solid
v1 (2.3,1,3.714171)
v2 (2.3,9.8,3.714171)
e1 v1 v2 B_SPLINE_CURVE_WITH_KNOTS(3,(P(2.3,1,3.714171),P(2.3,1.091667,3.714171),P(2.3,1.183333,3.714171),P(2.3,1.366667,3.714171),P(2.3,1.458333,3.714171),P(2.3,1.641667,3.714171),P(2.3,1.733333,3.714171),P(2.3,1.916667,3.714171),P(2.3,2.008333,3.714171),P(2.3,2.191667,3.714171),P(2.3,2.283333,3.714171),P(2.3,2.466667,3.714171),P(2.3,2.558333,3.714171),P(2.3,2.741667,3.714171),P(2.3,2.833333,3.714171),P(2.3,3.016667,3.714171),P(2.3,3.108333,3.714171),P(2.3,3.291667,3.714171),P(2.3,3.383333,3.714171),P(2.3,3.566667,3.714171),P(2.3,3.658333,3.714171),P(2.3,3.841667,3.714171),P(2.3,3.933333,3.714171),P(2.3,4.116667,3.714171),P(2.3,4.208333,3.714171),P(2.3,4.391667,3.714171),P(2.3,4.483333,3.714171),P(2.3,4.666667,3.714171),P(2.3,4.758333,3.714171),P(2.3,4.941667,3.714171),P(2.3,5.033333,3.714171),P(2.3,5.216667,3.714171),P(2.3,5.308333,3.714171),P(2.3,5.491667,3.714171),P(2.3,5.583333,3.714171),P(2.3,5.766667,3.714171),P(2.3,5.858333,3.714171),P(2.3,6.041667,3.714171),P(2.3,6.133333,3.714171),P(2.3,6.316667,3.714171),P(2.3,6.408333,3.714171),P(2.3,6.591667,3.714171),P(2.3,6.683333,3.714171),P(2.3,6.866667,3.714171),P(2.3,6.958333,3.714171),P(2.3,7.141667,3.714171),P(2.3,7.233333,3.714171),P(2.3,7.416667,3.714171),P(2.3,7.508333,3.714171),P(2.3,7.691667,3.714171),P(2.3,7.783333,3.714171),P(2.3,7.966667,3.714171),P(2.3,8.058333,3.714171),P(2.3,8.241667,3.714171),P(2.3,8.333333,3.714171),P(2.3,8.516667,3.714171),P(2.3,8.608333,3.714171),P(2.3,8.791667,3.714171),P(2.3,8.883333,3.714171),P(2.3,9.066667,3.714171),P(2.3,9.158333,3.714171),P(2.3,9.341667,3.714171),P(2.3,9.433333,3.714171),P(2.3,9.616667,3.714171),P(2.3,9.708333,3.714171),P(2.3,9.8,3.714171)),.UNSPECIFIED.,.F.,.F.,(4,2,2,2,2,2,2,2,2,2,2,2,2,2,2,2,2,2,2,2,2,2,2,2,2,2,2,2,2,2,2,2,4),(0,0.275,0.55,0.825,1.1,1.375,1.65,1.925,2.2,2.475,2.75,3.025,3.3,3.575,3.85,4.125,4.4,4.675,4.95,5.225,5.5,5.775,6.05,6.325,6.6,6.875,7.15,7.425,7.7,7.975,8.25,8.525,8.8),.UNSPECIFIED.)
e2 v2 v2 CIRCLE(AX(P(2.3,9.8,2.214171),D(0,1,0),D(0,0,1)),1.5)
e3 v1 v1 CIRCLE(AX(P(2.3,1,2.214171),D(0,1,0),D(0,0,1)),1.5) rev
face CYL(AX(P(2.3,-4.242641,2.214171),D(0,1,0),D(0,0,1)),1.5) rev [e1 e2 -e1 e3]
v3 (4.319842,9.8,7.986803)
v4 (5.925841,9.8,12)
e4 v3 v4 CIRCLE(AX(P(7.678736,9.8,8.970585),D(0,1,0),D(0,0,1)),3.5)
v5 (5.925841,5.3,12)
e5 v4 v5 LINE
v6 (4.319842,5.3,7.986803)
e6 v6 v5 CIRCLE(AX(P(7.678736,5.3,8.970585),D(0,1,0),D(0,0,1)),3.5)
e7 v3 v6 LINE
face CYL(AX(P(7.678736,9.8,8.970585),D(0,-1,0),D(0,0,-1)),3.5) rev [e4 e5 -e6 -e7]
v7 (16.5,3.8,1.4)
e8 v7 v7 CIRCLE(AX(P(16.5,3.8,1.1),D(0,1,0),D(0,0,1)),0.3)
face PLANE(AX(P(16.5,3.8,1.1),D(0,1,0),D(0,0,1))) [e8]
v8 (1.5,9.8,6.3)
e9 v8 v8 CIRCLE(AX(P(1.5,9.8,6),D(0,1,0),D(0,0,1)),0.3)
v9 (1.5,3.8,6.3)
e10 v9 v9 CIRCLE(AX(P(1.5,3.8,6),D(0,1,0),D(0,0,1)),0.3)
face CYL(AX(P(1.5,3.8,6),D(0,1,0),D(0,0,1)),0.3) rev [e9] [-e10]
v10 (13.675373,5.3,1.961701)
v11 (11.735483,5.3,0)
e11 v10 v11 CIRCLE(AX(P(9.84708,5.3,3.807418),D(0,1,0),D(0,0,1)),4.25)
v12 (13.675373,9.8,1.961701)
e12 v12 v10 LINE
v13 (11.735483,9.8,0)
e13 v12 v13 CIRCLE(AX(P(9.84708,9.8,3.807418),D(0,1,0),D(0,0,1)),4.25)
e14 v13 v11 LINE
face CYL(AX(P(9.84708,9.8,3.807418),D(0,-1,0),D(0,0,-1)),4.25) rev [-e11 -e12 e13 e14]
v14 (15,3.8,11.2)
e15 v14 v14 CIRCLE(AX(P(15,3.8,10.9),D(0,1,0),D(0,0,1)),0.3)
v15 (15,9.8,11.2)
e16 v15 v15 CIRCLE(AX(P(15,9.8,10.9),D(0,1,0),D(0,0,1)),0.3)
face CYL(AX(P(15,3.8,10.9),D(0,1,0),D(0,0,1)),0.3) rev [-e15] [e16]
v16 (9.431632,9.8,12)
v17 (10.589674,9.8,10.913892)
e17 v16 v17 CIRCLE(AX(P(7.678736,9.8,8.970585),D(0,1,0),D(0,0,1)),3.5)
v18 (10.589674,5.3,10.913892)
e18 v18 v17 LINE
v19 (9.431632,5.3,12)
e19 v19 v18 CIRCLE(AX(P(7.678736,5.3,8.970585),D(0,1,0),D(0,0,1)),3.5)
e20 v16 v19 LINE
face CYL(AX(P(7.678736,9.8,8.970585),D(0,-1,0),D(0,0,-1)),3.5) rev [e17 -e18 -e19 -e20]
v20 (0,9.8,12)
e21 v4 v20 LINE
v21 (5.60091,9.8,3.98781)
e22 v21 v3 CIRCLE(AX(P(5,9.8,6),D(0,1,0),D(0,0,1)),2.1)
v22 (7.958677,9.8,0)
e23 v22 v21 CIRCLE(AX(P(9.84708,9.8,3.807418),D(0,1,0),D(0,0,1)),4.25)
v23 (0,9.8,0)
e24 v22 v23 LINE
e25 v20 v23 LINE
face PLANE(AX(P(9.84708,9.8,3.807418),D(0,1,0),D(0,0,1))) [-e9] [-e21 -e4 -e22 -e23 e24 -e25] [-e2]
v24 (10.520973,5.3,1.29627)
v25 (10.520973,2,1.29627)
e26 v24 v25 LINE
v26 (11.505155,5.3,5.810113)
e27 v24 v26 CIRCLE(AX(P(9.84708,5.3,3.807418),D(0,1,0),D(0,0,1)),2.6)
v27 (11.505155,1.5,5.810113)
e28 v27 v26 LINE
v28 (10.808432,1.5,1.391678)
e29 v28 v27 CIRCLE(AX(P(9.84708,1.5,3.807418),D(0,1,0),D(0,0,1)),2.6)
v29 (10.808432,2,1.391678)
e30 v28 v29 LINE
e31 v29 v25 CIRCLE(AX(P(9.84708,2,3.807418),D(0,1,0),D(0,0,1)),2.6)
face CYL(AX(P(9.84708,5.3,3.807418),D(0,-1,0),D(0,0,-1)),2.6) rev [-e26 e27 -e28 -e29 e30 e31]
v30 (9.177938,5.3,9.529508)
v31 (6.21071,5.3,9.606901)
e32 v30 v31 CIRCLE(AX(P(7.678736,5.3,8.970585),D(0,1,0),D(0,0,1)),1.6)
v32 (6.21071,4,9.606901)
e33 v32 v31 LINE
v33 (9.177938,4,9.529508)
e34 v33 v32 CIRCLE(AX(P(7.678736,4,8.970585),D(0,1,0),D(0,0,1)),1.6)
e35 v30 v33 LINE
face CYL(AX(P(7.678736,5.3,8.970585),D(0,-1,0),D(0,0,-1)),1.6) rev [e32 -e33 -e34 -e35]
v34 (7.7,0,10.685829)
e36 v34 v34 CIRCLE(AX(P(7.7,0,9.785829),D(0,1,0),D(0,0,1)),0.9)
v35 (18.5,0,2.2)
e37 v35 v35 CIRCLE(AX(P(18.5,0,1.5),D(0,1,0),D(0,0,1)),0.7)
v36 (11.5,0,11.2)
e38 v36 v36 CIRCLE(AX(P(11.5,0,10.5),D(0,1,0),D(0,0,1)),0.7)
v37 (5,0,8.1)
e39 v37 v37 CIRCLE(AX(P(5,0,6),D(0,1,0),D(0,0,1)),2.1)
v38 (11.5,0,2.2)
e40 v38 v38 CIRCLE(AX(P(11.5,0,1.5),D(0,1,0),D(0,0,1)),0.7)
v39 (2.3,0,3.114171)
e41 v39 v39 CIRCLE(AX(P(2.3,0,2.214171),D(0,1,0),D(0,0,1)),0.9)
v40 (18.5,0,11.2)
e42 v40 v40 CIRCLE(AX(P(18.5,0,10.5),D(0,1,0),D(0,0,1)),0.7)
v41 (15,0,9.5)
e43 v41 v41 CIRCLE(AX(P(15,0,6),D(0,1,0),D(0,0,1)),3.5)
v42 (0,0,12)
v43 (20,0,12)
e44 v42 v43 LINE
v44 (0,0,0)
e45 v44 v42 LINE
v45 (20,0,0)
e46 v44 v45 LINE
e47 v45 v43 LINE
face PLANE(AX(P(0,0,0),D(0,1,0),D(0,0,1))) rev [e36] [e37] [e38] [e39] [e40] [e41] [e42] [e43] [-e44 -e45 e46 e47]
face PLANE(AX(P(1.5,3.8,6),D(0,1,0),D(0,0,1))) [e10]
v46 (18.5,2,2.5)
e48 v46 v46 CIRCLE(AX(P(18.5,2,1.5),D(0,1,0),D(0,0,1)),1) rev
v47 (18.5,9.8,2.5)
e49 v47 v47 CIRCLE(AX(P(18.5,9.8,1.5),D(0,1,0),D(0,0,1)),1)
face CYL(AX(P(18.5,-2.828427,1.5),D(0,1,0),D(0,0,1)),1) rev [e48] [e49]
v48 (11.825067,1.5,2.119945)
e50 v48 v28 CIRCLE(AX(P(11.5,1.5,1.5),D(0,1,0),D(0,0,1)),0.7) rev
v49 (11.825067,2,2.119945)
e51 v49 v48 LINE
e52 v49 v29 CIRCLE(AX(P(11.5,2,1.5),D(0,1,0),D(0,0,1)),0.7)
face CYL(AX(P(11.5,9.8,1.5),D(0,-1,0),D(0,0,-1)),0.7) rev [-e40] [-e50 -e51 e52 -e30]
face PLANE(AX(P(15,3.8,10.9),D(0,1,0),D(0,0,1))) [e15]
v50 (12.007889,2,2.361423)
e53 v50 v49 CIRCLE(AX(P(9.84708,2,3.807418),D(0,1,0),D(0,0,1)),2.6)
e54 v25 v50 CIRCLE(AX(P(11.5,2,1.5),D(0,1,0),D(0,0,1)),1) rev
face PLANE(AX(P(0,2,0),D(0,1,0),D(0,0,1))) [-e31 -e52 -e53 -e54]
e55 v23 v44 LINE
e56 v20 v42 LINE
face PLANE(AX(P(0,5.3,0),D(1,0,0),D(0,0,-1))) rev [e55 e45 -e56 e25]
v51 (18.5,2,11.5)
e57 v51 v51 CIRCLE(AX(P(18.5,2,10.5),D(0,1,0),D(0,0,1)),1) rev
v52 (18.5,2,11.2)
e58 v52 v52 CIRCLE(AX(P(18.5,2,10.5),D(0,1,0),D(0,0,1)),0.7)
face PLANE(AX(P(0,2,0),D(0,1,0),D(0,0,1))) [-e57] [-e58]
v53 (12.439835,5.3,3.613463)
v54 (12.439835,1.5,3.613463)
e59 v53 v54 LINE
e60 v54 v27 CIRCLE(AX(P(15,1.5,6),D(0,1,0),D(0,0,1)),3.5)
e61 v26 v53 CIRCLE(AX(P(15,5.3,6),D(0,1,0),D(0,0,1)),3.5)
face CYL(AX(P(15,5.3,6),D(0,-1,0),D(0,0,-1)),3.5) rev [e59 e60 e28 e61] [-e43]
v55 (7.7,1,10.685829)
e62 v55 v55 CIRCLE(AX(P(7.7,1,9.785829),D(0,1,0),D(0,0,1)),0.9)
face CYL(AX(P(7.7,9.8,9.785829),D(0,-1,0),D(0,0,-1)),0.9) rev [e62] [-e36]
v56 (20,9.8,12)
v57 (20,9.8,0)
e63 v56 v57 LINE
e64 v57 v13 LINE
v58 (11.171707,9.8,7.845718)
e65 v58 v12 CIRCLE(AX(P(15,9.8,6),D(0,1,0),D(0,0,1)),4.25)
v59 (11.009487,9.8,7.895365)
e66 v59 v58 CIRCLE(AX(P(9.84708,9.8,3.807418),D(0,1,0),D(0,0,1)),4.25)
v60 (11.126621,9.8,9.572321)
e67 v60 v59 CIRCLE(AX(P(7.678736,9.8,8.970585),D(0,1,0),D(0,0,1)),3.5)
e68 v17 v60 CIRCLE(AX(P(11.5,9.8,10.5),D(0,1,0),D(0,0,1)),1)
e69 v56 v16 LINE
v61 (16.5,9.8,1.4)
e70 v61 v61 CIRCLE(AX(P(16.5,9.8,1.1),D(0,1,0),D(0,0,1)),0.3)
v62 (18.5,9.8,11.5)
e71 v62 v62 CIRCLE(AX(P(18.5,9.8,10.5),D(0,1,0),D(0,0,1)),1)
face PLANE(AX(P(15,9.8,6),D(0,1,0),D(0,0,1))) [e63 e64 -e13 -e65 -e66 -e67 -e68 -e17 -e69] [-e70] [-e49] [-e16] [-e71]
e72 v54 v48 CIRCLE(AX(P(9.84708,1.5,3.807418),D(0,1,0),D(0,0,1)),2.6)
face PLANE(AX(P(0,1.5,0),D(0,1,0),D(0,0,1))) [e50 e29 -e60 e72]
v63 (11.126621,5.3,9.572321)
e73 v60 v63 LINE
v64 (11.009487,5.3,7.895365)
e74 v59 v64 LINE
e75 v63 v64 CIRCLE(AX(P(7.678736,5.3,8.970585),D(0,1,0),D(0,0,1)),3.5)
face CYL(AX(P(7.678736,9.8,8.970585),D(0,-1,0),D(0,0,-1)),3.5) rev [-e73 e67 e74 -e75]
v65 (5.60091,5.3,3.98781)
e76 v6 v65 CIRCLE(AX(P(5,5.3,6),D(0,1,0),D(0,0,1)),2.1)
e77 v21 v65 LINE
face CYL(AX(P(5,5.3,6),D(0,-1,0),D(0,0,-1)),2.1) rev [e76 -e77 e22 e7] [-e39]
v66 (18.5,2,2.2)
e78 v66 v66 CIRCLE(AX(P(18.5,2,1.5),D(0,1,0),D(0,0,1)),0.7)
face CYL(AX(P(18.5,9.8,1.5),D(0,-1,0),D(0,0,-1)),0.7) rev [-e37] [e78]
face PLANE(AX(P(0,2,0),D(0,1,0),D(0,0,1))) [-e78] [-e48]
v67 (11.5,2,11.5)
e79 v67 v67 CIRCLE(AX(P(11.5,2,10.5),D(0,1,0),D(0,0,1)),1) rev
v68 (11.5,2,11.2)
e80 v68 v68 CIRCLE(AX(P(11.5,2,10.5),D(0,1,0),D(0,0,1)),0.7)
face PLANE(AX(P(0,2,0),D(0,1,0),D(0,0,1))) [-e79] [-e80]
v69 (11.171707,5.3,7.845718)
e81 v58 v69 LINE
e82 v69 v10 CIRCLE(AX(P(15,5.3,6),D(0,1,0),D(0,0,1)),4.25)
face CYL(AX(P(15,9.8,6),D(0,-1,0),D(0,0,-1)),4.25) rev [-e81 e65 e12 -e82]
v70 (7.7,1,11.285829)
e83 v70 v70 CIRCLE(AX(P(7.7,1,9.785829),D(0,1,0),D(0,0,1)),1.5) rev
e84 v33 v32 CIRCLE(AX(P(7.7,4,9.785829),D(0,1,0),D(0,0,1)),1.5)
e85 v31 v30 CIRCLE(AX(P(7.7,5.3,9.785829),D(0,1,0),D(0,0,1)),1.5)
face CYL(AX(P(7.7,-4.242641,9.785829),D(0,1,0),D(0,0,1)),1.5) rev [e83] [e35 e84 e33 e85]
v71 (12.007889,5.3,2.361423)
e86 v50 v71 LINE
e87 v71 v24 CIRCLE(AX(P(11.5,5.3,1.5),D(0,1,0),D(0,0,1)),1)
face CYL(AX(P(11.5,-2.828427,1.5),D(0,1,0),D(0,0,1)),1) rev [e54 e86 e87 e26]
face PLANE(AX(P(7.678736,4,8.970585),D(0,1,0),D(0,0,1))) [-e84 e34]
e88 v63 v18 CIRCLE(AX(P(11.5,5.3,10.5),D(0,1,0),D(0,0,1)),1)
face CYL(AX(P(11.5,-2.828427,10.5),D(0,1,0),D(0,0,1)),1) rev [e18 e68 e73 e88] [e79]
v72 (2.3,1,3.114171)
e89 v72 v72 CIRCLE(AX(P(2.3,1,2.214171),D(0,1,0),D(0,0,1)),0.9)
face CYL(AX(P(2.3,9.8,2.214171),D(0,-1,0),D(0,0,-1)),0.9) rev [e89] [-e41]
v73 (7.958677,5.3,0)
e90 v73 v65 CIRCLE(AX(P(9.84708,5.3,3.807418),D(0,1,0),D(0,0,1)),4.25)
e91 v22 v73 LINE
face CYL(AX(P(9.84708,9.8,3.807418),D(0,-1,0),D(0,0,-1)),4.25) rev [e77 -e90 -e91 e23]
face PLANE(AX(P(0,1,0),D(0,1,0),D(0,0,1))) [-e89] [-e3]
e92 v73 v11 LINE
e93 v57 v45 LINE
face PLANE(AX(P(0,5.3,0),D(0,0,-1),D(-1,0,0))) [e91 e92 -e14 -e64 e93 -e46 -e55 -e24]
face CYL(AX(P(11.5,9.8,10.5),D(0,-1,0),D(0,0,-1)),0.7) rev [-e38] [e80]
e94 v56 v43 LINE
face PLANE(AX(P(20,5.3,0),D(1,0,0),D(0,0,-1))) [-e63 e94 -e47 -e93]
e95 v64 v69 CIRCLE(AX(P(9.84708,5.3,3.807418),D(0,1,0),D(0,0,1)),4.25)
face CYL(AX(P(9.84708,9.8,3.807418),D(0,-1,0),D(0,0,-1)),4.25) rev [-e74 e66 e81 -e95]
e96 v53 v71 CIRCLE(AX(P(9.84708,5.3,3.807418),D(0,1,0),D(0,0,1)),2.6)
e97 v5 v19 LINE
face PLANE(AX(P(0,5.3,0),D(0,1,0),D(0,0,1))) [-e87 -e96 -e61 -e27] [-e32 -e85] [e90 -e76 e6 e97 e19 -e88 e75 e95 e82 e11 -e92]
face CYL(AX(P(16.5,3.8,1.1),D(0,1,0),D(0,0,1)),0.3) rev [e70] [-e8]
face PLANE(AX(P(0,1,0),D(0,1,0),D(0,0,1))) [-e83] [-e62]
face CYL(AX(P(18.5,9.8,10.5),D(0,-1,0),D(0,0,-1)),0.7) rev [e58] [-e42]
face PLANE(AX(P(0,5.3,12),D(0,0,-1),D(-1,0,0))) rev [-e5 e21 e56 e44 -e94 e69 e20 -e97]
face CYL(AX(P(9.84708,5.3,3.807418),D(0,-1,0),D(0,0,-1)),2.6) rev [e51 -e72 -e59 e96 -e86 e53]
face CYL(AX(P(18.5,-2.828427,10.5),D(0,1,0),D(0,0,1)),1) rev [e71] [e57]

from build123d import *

# Parameters (mm, degrees)
SKETCH_1_W          = 20
SKETCH_1_H          = 12
SKETCH_1_R          = 1.6
SKETCH_1_R_2        = 2.1
EXTRUDE_1_DEPTH     = 5.3
EXTRUDE_2_DEPTH     = 1.5
SKETCH_1_5_R        = 1.6
EXTRUDE_3_DEPTH     = 4
EXTRUDE_START       = 5.3
EXTRUDE_4_DEPTH     = 4.5
SKETCH_2_R          = 0.9
SKETCH_2_R_2        = 0.7
CUT_EXTRUDE_1_DEPTH = 26.299011838
CUT_EXTRUDE_START   = 9.8
SKETCH_2_3_R        = 1.5
CUT_EXTRUDE_2_DEPTH = 8.8
SKETCH_2_4_R        = 1
CUT_EXTRUDE_3_DEPTH = 7.8
SKETCH_2_5_R        = 0.3
CUT_EXTRUDE_4_DEPTH = 6


with BuildPart() as part:
    # 草图1 → 凸台-拉伸1 (new body)
    with BuildSketch(Plane(origin=(0, 0, 0), x_dir=(1, 0, 0), z_dir=(0, 1, 0))):
        with Locations((10, -6)):
            Rectangle(SKETCH_1_W, SKETCH_1_H)
        with BuildLine():
            ThreePointArc((12.439835428, -3.613463312), (18.220575086, -7.370363498), (11.50515478, -5.81011348))
            ThreePointArc((11.50515478, -5.81011348), (7.454652656, -2.789434091), (12.439835428, -3.613463312))
        make_face(mode=Mode.SUBTRACT)
        with Locations(Location((7.678736094, -8.970584613, 0), (0, 0, 270))):
            Circle(SKETCH_1_R, mode=Mode.SUBTRACT)
        with Locations(Location((5, -6, 0), (0, 0, 270))):
            Circle(SKETCH_1_R_2, mode=Mode.SUBTRACT)
    extrude(amount=EXTRUDE_1_DEPTH)

    # 草图1<4> → 凸台-拉伸2 (add)
    with BuildSketch(Plane(origin=(0, 0, 0), x_dir=(1, 0, 0), z_dir=(0, 1, 0))):
        with BuildLine():
            ThreePointArc((11.50515478, -5.81011348), (11.779424914, -4.629636502), (12.439835428, -3.613463312))
            ThreePointArc((12.439835428, -3.613463312), (7.454652656, -2.789434091), (11.50515478, -5.81011348))
        make_face()
    extrude(amount=EXTRUDE_2_DEPTH)

    # 草图1<5> → 凸台-拉伸3 (add)
    with BuildSketch(Plane(origin=(0, 0, 0), x_dir=(1, 0, 0), z_dir=(0, 1, 0))):
        with Locations(Location((7.678736094, -8.970584613, 0), (0, 0, 270))):
            Circle(SKETCH_1_5_R)
    extrude(amount=EXTRUDE_3_DEPTH)

    # 草图1<6> → 凸台-拉伸4 (add)
    with BuildSketch(Plane(origin=(0, 0, 0), x_dir=(1, 0, 0), z_dir=(0, 1, 0)).offset(EXTRUDE_START)):
        with BuildLine():
            Line((7.958677072, 0), (0, 0))
            Line((0, 0), (0, -12))
            Line((0, -12), (5.925840657, -12))
            ThreePointArc((5.925840657, -12), (4.429268792, -10.270954659), (4.319841502, -7.986802561))
            ThreePointArc((4.319841502, -7.986802561), (3.000111311, -5.359340003), (5.600909971, -3.987810345))
            ThreePointArc((5.600909971, -3.987810345), (6.188678117, -1.644412009), (7.958677072, 0))
        make_face()
        with BuildLine():
            Line((20, 0), (11.735482653, 0))
            ThreePointArc((11.735482653, 0), (12.869036074, -0.819060885), (13.675372646, -1.961700559))
            ThreePointArc((13.675372646, -1.961700559), (18.910698319, -7.664012819), (11.171707216, -7.845717845))
            ThreePointArc((11.171707216, -7.845717845), (11.090844977, -7.871351024), (11.009487245, -7.895365208))
            ThreePointArc((11.009487245, -7.895365208), (10.945672327, -10.226422042), (9.43163153, -12))
            Line((9.43163153, -12), (20, -12))
            Line((20, -12), (20, 0))
        make_face()
    extrude(amount=EXTRUDE_4_DEPTH)

    # 草图2 → 切除-拉伸1 (cut, through all)
    with BuildSketch(Plane(origin=(0, 0, 0), x_dir=(1, 0, 0), z_dir=(0, 1, 0))):
        with Locations(Location((2.3, -2.214171161, 0), (0, 0, 270))):
            Circle(SKETCH_2_R)
        with Locations(Location((7.7, -9.785828839, 0), (0, 0, 313.840961576))):
            Circle(SKETCH_2_R)
        with Locations(Location((11.5, -1.5, 0), (0, 0, 171.097944201))):
            Circle(SKETCH_2_R_2)
        with Locations(Location((18.5, -10.5, 0), (0, 0, 270))):
            Circle(SKETCH_2_R_2)
        with Locations(Location((18.5, -1.5, 0), (0, 0, 270))):
            Circle(SKETCH_2_R_2)
        with Locations(Location((11.5, -10.5, 0), (0, 0, 132.232284036))):
            Circle(SKETCH_2_R_2)
    extrude(amount=CUT_EXTRUDE_1_DEPTH, mode=Mode.SUBTRACT)

    # 草图2<3> → 切除-拉伸2 (cut)
    with BuildSketch(Plane(origin=(0, 0, 0), x_dir=(1, 0, 0), z_dir=(0, 1, 0)).offset(CUT_EXTRUDE_START)):
        with Locations(Location((2.3, -2.214171161, 0), (0, 0, 270))):
            Circle(SKETCH_2_3_R)
        with Locations(Location((7.7, -9.785828839, 0), (0, 0, 270))):
            Circle(SKETCH_2_3_R)
    extrude(amount=-CUT_EXTRUDE_2_DEPTH, mode=Mode.SUBTRACT)

    # 草图2<4> → 切除-拉伸3 (cut)
    with BuildSketch(Plane(origin=(0, 0, 0), x_dir=(1, 0, 0), z_dir=(0, 1, 0)).offset(CUT_EXTRUDE_START)):
        with Locations((11.5, -1.5)):
            Circle(SKETCH_2_4_R)
        with Locations(Location((18.5, -10.5, 0), (0, 0, 270))):
            Circle(SKETCH_2_4_R)
        with Locations(Location((18.5, -1.5, 0), (0, 0, 270))):
            Circle(SKETCH_2_4_R)
        with Locations(Location((11.5, -10.5, 0), (0, 0, 270))):
            Circle(SKETCH_2_4_R)
    extrude(amount=-CUT_EXTRUDE_3_DEPTH, mode=Mode.SUBTRACT)

    # 草图2<5> → 切除-拉伸4 (cut)
    with BuildSketch(Plane(origin=(0, 0, 0), x_dir=(1, 0, 0), z_dir=(0, 1, 0)).offset(CUT_EXTRUDE_START)):
        with Locations(Location((1.5, -6, 0), (0, 0, 270))):
            Circle(SKETCH_2_5_R)
        with Locations(Location((16.5, -1.1, 0), (0, 0, 270))):
            Circle(SKETCH_2_5_R)
        with Locations(Location((15, -10.9, 0), (0, 0, 270))):
            Circle(SKETCH_2_5_R)
    extrude(amount=-CUT_EXTRUDE_4_DEPTH, mode=Mode.SUBTRACT)


solid = part.part
